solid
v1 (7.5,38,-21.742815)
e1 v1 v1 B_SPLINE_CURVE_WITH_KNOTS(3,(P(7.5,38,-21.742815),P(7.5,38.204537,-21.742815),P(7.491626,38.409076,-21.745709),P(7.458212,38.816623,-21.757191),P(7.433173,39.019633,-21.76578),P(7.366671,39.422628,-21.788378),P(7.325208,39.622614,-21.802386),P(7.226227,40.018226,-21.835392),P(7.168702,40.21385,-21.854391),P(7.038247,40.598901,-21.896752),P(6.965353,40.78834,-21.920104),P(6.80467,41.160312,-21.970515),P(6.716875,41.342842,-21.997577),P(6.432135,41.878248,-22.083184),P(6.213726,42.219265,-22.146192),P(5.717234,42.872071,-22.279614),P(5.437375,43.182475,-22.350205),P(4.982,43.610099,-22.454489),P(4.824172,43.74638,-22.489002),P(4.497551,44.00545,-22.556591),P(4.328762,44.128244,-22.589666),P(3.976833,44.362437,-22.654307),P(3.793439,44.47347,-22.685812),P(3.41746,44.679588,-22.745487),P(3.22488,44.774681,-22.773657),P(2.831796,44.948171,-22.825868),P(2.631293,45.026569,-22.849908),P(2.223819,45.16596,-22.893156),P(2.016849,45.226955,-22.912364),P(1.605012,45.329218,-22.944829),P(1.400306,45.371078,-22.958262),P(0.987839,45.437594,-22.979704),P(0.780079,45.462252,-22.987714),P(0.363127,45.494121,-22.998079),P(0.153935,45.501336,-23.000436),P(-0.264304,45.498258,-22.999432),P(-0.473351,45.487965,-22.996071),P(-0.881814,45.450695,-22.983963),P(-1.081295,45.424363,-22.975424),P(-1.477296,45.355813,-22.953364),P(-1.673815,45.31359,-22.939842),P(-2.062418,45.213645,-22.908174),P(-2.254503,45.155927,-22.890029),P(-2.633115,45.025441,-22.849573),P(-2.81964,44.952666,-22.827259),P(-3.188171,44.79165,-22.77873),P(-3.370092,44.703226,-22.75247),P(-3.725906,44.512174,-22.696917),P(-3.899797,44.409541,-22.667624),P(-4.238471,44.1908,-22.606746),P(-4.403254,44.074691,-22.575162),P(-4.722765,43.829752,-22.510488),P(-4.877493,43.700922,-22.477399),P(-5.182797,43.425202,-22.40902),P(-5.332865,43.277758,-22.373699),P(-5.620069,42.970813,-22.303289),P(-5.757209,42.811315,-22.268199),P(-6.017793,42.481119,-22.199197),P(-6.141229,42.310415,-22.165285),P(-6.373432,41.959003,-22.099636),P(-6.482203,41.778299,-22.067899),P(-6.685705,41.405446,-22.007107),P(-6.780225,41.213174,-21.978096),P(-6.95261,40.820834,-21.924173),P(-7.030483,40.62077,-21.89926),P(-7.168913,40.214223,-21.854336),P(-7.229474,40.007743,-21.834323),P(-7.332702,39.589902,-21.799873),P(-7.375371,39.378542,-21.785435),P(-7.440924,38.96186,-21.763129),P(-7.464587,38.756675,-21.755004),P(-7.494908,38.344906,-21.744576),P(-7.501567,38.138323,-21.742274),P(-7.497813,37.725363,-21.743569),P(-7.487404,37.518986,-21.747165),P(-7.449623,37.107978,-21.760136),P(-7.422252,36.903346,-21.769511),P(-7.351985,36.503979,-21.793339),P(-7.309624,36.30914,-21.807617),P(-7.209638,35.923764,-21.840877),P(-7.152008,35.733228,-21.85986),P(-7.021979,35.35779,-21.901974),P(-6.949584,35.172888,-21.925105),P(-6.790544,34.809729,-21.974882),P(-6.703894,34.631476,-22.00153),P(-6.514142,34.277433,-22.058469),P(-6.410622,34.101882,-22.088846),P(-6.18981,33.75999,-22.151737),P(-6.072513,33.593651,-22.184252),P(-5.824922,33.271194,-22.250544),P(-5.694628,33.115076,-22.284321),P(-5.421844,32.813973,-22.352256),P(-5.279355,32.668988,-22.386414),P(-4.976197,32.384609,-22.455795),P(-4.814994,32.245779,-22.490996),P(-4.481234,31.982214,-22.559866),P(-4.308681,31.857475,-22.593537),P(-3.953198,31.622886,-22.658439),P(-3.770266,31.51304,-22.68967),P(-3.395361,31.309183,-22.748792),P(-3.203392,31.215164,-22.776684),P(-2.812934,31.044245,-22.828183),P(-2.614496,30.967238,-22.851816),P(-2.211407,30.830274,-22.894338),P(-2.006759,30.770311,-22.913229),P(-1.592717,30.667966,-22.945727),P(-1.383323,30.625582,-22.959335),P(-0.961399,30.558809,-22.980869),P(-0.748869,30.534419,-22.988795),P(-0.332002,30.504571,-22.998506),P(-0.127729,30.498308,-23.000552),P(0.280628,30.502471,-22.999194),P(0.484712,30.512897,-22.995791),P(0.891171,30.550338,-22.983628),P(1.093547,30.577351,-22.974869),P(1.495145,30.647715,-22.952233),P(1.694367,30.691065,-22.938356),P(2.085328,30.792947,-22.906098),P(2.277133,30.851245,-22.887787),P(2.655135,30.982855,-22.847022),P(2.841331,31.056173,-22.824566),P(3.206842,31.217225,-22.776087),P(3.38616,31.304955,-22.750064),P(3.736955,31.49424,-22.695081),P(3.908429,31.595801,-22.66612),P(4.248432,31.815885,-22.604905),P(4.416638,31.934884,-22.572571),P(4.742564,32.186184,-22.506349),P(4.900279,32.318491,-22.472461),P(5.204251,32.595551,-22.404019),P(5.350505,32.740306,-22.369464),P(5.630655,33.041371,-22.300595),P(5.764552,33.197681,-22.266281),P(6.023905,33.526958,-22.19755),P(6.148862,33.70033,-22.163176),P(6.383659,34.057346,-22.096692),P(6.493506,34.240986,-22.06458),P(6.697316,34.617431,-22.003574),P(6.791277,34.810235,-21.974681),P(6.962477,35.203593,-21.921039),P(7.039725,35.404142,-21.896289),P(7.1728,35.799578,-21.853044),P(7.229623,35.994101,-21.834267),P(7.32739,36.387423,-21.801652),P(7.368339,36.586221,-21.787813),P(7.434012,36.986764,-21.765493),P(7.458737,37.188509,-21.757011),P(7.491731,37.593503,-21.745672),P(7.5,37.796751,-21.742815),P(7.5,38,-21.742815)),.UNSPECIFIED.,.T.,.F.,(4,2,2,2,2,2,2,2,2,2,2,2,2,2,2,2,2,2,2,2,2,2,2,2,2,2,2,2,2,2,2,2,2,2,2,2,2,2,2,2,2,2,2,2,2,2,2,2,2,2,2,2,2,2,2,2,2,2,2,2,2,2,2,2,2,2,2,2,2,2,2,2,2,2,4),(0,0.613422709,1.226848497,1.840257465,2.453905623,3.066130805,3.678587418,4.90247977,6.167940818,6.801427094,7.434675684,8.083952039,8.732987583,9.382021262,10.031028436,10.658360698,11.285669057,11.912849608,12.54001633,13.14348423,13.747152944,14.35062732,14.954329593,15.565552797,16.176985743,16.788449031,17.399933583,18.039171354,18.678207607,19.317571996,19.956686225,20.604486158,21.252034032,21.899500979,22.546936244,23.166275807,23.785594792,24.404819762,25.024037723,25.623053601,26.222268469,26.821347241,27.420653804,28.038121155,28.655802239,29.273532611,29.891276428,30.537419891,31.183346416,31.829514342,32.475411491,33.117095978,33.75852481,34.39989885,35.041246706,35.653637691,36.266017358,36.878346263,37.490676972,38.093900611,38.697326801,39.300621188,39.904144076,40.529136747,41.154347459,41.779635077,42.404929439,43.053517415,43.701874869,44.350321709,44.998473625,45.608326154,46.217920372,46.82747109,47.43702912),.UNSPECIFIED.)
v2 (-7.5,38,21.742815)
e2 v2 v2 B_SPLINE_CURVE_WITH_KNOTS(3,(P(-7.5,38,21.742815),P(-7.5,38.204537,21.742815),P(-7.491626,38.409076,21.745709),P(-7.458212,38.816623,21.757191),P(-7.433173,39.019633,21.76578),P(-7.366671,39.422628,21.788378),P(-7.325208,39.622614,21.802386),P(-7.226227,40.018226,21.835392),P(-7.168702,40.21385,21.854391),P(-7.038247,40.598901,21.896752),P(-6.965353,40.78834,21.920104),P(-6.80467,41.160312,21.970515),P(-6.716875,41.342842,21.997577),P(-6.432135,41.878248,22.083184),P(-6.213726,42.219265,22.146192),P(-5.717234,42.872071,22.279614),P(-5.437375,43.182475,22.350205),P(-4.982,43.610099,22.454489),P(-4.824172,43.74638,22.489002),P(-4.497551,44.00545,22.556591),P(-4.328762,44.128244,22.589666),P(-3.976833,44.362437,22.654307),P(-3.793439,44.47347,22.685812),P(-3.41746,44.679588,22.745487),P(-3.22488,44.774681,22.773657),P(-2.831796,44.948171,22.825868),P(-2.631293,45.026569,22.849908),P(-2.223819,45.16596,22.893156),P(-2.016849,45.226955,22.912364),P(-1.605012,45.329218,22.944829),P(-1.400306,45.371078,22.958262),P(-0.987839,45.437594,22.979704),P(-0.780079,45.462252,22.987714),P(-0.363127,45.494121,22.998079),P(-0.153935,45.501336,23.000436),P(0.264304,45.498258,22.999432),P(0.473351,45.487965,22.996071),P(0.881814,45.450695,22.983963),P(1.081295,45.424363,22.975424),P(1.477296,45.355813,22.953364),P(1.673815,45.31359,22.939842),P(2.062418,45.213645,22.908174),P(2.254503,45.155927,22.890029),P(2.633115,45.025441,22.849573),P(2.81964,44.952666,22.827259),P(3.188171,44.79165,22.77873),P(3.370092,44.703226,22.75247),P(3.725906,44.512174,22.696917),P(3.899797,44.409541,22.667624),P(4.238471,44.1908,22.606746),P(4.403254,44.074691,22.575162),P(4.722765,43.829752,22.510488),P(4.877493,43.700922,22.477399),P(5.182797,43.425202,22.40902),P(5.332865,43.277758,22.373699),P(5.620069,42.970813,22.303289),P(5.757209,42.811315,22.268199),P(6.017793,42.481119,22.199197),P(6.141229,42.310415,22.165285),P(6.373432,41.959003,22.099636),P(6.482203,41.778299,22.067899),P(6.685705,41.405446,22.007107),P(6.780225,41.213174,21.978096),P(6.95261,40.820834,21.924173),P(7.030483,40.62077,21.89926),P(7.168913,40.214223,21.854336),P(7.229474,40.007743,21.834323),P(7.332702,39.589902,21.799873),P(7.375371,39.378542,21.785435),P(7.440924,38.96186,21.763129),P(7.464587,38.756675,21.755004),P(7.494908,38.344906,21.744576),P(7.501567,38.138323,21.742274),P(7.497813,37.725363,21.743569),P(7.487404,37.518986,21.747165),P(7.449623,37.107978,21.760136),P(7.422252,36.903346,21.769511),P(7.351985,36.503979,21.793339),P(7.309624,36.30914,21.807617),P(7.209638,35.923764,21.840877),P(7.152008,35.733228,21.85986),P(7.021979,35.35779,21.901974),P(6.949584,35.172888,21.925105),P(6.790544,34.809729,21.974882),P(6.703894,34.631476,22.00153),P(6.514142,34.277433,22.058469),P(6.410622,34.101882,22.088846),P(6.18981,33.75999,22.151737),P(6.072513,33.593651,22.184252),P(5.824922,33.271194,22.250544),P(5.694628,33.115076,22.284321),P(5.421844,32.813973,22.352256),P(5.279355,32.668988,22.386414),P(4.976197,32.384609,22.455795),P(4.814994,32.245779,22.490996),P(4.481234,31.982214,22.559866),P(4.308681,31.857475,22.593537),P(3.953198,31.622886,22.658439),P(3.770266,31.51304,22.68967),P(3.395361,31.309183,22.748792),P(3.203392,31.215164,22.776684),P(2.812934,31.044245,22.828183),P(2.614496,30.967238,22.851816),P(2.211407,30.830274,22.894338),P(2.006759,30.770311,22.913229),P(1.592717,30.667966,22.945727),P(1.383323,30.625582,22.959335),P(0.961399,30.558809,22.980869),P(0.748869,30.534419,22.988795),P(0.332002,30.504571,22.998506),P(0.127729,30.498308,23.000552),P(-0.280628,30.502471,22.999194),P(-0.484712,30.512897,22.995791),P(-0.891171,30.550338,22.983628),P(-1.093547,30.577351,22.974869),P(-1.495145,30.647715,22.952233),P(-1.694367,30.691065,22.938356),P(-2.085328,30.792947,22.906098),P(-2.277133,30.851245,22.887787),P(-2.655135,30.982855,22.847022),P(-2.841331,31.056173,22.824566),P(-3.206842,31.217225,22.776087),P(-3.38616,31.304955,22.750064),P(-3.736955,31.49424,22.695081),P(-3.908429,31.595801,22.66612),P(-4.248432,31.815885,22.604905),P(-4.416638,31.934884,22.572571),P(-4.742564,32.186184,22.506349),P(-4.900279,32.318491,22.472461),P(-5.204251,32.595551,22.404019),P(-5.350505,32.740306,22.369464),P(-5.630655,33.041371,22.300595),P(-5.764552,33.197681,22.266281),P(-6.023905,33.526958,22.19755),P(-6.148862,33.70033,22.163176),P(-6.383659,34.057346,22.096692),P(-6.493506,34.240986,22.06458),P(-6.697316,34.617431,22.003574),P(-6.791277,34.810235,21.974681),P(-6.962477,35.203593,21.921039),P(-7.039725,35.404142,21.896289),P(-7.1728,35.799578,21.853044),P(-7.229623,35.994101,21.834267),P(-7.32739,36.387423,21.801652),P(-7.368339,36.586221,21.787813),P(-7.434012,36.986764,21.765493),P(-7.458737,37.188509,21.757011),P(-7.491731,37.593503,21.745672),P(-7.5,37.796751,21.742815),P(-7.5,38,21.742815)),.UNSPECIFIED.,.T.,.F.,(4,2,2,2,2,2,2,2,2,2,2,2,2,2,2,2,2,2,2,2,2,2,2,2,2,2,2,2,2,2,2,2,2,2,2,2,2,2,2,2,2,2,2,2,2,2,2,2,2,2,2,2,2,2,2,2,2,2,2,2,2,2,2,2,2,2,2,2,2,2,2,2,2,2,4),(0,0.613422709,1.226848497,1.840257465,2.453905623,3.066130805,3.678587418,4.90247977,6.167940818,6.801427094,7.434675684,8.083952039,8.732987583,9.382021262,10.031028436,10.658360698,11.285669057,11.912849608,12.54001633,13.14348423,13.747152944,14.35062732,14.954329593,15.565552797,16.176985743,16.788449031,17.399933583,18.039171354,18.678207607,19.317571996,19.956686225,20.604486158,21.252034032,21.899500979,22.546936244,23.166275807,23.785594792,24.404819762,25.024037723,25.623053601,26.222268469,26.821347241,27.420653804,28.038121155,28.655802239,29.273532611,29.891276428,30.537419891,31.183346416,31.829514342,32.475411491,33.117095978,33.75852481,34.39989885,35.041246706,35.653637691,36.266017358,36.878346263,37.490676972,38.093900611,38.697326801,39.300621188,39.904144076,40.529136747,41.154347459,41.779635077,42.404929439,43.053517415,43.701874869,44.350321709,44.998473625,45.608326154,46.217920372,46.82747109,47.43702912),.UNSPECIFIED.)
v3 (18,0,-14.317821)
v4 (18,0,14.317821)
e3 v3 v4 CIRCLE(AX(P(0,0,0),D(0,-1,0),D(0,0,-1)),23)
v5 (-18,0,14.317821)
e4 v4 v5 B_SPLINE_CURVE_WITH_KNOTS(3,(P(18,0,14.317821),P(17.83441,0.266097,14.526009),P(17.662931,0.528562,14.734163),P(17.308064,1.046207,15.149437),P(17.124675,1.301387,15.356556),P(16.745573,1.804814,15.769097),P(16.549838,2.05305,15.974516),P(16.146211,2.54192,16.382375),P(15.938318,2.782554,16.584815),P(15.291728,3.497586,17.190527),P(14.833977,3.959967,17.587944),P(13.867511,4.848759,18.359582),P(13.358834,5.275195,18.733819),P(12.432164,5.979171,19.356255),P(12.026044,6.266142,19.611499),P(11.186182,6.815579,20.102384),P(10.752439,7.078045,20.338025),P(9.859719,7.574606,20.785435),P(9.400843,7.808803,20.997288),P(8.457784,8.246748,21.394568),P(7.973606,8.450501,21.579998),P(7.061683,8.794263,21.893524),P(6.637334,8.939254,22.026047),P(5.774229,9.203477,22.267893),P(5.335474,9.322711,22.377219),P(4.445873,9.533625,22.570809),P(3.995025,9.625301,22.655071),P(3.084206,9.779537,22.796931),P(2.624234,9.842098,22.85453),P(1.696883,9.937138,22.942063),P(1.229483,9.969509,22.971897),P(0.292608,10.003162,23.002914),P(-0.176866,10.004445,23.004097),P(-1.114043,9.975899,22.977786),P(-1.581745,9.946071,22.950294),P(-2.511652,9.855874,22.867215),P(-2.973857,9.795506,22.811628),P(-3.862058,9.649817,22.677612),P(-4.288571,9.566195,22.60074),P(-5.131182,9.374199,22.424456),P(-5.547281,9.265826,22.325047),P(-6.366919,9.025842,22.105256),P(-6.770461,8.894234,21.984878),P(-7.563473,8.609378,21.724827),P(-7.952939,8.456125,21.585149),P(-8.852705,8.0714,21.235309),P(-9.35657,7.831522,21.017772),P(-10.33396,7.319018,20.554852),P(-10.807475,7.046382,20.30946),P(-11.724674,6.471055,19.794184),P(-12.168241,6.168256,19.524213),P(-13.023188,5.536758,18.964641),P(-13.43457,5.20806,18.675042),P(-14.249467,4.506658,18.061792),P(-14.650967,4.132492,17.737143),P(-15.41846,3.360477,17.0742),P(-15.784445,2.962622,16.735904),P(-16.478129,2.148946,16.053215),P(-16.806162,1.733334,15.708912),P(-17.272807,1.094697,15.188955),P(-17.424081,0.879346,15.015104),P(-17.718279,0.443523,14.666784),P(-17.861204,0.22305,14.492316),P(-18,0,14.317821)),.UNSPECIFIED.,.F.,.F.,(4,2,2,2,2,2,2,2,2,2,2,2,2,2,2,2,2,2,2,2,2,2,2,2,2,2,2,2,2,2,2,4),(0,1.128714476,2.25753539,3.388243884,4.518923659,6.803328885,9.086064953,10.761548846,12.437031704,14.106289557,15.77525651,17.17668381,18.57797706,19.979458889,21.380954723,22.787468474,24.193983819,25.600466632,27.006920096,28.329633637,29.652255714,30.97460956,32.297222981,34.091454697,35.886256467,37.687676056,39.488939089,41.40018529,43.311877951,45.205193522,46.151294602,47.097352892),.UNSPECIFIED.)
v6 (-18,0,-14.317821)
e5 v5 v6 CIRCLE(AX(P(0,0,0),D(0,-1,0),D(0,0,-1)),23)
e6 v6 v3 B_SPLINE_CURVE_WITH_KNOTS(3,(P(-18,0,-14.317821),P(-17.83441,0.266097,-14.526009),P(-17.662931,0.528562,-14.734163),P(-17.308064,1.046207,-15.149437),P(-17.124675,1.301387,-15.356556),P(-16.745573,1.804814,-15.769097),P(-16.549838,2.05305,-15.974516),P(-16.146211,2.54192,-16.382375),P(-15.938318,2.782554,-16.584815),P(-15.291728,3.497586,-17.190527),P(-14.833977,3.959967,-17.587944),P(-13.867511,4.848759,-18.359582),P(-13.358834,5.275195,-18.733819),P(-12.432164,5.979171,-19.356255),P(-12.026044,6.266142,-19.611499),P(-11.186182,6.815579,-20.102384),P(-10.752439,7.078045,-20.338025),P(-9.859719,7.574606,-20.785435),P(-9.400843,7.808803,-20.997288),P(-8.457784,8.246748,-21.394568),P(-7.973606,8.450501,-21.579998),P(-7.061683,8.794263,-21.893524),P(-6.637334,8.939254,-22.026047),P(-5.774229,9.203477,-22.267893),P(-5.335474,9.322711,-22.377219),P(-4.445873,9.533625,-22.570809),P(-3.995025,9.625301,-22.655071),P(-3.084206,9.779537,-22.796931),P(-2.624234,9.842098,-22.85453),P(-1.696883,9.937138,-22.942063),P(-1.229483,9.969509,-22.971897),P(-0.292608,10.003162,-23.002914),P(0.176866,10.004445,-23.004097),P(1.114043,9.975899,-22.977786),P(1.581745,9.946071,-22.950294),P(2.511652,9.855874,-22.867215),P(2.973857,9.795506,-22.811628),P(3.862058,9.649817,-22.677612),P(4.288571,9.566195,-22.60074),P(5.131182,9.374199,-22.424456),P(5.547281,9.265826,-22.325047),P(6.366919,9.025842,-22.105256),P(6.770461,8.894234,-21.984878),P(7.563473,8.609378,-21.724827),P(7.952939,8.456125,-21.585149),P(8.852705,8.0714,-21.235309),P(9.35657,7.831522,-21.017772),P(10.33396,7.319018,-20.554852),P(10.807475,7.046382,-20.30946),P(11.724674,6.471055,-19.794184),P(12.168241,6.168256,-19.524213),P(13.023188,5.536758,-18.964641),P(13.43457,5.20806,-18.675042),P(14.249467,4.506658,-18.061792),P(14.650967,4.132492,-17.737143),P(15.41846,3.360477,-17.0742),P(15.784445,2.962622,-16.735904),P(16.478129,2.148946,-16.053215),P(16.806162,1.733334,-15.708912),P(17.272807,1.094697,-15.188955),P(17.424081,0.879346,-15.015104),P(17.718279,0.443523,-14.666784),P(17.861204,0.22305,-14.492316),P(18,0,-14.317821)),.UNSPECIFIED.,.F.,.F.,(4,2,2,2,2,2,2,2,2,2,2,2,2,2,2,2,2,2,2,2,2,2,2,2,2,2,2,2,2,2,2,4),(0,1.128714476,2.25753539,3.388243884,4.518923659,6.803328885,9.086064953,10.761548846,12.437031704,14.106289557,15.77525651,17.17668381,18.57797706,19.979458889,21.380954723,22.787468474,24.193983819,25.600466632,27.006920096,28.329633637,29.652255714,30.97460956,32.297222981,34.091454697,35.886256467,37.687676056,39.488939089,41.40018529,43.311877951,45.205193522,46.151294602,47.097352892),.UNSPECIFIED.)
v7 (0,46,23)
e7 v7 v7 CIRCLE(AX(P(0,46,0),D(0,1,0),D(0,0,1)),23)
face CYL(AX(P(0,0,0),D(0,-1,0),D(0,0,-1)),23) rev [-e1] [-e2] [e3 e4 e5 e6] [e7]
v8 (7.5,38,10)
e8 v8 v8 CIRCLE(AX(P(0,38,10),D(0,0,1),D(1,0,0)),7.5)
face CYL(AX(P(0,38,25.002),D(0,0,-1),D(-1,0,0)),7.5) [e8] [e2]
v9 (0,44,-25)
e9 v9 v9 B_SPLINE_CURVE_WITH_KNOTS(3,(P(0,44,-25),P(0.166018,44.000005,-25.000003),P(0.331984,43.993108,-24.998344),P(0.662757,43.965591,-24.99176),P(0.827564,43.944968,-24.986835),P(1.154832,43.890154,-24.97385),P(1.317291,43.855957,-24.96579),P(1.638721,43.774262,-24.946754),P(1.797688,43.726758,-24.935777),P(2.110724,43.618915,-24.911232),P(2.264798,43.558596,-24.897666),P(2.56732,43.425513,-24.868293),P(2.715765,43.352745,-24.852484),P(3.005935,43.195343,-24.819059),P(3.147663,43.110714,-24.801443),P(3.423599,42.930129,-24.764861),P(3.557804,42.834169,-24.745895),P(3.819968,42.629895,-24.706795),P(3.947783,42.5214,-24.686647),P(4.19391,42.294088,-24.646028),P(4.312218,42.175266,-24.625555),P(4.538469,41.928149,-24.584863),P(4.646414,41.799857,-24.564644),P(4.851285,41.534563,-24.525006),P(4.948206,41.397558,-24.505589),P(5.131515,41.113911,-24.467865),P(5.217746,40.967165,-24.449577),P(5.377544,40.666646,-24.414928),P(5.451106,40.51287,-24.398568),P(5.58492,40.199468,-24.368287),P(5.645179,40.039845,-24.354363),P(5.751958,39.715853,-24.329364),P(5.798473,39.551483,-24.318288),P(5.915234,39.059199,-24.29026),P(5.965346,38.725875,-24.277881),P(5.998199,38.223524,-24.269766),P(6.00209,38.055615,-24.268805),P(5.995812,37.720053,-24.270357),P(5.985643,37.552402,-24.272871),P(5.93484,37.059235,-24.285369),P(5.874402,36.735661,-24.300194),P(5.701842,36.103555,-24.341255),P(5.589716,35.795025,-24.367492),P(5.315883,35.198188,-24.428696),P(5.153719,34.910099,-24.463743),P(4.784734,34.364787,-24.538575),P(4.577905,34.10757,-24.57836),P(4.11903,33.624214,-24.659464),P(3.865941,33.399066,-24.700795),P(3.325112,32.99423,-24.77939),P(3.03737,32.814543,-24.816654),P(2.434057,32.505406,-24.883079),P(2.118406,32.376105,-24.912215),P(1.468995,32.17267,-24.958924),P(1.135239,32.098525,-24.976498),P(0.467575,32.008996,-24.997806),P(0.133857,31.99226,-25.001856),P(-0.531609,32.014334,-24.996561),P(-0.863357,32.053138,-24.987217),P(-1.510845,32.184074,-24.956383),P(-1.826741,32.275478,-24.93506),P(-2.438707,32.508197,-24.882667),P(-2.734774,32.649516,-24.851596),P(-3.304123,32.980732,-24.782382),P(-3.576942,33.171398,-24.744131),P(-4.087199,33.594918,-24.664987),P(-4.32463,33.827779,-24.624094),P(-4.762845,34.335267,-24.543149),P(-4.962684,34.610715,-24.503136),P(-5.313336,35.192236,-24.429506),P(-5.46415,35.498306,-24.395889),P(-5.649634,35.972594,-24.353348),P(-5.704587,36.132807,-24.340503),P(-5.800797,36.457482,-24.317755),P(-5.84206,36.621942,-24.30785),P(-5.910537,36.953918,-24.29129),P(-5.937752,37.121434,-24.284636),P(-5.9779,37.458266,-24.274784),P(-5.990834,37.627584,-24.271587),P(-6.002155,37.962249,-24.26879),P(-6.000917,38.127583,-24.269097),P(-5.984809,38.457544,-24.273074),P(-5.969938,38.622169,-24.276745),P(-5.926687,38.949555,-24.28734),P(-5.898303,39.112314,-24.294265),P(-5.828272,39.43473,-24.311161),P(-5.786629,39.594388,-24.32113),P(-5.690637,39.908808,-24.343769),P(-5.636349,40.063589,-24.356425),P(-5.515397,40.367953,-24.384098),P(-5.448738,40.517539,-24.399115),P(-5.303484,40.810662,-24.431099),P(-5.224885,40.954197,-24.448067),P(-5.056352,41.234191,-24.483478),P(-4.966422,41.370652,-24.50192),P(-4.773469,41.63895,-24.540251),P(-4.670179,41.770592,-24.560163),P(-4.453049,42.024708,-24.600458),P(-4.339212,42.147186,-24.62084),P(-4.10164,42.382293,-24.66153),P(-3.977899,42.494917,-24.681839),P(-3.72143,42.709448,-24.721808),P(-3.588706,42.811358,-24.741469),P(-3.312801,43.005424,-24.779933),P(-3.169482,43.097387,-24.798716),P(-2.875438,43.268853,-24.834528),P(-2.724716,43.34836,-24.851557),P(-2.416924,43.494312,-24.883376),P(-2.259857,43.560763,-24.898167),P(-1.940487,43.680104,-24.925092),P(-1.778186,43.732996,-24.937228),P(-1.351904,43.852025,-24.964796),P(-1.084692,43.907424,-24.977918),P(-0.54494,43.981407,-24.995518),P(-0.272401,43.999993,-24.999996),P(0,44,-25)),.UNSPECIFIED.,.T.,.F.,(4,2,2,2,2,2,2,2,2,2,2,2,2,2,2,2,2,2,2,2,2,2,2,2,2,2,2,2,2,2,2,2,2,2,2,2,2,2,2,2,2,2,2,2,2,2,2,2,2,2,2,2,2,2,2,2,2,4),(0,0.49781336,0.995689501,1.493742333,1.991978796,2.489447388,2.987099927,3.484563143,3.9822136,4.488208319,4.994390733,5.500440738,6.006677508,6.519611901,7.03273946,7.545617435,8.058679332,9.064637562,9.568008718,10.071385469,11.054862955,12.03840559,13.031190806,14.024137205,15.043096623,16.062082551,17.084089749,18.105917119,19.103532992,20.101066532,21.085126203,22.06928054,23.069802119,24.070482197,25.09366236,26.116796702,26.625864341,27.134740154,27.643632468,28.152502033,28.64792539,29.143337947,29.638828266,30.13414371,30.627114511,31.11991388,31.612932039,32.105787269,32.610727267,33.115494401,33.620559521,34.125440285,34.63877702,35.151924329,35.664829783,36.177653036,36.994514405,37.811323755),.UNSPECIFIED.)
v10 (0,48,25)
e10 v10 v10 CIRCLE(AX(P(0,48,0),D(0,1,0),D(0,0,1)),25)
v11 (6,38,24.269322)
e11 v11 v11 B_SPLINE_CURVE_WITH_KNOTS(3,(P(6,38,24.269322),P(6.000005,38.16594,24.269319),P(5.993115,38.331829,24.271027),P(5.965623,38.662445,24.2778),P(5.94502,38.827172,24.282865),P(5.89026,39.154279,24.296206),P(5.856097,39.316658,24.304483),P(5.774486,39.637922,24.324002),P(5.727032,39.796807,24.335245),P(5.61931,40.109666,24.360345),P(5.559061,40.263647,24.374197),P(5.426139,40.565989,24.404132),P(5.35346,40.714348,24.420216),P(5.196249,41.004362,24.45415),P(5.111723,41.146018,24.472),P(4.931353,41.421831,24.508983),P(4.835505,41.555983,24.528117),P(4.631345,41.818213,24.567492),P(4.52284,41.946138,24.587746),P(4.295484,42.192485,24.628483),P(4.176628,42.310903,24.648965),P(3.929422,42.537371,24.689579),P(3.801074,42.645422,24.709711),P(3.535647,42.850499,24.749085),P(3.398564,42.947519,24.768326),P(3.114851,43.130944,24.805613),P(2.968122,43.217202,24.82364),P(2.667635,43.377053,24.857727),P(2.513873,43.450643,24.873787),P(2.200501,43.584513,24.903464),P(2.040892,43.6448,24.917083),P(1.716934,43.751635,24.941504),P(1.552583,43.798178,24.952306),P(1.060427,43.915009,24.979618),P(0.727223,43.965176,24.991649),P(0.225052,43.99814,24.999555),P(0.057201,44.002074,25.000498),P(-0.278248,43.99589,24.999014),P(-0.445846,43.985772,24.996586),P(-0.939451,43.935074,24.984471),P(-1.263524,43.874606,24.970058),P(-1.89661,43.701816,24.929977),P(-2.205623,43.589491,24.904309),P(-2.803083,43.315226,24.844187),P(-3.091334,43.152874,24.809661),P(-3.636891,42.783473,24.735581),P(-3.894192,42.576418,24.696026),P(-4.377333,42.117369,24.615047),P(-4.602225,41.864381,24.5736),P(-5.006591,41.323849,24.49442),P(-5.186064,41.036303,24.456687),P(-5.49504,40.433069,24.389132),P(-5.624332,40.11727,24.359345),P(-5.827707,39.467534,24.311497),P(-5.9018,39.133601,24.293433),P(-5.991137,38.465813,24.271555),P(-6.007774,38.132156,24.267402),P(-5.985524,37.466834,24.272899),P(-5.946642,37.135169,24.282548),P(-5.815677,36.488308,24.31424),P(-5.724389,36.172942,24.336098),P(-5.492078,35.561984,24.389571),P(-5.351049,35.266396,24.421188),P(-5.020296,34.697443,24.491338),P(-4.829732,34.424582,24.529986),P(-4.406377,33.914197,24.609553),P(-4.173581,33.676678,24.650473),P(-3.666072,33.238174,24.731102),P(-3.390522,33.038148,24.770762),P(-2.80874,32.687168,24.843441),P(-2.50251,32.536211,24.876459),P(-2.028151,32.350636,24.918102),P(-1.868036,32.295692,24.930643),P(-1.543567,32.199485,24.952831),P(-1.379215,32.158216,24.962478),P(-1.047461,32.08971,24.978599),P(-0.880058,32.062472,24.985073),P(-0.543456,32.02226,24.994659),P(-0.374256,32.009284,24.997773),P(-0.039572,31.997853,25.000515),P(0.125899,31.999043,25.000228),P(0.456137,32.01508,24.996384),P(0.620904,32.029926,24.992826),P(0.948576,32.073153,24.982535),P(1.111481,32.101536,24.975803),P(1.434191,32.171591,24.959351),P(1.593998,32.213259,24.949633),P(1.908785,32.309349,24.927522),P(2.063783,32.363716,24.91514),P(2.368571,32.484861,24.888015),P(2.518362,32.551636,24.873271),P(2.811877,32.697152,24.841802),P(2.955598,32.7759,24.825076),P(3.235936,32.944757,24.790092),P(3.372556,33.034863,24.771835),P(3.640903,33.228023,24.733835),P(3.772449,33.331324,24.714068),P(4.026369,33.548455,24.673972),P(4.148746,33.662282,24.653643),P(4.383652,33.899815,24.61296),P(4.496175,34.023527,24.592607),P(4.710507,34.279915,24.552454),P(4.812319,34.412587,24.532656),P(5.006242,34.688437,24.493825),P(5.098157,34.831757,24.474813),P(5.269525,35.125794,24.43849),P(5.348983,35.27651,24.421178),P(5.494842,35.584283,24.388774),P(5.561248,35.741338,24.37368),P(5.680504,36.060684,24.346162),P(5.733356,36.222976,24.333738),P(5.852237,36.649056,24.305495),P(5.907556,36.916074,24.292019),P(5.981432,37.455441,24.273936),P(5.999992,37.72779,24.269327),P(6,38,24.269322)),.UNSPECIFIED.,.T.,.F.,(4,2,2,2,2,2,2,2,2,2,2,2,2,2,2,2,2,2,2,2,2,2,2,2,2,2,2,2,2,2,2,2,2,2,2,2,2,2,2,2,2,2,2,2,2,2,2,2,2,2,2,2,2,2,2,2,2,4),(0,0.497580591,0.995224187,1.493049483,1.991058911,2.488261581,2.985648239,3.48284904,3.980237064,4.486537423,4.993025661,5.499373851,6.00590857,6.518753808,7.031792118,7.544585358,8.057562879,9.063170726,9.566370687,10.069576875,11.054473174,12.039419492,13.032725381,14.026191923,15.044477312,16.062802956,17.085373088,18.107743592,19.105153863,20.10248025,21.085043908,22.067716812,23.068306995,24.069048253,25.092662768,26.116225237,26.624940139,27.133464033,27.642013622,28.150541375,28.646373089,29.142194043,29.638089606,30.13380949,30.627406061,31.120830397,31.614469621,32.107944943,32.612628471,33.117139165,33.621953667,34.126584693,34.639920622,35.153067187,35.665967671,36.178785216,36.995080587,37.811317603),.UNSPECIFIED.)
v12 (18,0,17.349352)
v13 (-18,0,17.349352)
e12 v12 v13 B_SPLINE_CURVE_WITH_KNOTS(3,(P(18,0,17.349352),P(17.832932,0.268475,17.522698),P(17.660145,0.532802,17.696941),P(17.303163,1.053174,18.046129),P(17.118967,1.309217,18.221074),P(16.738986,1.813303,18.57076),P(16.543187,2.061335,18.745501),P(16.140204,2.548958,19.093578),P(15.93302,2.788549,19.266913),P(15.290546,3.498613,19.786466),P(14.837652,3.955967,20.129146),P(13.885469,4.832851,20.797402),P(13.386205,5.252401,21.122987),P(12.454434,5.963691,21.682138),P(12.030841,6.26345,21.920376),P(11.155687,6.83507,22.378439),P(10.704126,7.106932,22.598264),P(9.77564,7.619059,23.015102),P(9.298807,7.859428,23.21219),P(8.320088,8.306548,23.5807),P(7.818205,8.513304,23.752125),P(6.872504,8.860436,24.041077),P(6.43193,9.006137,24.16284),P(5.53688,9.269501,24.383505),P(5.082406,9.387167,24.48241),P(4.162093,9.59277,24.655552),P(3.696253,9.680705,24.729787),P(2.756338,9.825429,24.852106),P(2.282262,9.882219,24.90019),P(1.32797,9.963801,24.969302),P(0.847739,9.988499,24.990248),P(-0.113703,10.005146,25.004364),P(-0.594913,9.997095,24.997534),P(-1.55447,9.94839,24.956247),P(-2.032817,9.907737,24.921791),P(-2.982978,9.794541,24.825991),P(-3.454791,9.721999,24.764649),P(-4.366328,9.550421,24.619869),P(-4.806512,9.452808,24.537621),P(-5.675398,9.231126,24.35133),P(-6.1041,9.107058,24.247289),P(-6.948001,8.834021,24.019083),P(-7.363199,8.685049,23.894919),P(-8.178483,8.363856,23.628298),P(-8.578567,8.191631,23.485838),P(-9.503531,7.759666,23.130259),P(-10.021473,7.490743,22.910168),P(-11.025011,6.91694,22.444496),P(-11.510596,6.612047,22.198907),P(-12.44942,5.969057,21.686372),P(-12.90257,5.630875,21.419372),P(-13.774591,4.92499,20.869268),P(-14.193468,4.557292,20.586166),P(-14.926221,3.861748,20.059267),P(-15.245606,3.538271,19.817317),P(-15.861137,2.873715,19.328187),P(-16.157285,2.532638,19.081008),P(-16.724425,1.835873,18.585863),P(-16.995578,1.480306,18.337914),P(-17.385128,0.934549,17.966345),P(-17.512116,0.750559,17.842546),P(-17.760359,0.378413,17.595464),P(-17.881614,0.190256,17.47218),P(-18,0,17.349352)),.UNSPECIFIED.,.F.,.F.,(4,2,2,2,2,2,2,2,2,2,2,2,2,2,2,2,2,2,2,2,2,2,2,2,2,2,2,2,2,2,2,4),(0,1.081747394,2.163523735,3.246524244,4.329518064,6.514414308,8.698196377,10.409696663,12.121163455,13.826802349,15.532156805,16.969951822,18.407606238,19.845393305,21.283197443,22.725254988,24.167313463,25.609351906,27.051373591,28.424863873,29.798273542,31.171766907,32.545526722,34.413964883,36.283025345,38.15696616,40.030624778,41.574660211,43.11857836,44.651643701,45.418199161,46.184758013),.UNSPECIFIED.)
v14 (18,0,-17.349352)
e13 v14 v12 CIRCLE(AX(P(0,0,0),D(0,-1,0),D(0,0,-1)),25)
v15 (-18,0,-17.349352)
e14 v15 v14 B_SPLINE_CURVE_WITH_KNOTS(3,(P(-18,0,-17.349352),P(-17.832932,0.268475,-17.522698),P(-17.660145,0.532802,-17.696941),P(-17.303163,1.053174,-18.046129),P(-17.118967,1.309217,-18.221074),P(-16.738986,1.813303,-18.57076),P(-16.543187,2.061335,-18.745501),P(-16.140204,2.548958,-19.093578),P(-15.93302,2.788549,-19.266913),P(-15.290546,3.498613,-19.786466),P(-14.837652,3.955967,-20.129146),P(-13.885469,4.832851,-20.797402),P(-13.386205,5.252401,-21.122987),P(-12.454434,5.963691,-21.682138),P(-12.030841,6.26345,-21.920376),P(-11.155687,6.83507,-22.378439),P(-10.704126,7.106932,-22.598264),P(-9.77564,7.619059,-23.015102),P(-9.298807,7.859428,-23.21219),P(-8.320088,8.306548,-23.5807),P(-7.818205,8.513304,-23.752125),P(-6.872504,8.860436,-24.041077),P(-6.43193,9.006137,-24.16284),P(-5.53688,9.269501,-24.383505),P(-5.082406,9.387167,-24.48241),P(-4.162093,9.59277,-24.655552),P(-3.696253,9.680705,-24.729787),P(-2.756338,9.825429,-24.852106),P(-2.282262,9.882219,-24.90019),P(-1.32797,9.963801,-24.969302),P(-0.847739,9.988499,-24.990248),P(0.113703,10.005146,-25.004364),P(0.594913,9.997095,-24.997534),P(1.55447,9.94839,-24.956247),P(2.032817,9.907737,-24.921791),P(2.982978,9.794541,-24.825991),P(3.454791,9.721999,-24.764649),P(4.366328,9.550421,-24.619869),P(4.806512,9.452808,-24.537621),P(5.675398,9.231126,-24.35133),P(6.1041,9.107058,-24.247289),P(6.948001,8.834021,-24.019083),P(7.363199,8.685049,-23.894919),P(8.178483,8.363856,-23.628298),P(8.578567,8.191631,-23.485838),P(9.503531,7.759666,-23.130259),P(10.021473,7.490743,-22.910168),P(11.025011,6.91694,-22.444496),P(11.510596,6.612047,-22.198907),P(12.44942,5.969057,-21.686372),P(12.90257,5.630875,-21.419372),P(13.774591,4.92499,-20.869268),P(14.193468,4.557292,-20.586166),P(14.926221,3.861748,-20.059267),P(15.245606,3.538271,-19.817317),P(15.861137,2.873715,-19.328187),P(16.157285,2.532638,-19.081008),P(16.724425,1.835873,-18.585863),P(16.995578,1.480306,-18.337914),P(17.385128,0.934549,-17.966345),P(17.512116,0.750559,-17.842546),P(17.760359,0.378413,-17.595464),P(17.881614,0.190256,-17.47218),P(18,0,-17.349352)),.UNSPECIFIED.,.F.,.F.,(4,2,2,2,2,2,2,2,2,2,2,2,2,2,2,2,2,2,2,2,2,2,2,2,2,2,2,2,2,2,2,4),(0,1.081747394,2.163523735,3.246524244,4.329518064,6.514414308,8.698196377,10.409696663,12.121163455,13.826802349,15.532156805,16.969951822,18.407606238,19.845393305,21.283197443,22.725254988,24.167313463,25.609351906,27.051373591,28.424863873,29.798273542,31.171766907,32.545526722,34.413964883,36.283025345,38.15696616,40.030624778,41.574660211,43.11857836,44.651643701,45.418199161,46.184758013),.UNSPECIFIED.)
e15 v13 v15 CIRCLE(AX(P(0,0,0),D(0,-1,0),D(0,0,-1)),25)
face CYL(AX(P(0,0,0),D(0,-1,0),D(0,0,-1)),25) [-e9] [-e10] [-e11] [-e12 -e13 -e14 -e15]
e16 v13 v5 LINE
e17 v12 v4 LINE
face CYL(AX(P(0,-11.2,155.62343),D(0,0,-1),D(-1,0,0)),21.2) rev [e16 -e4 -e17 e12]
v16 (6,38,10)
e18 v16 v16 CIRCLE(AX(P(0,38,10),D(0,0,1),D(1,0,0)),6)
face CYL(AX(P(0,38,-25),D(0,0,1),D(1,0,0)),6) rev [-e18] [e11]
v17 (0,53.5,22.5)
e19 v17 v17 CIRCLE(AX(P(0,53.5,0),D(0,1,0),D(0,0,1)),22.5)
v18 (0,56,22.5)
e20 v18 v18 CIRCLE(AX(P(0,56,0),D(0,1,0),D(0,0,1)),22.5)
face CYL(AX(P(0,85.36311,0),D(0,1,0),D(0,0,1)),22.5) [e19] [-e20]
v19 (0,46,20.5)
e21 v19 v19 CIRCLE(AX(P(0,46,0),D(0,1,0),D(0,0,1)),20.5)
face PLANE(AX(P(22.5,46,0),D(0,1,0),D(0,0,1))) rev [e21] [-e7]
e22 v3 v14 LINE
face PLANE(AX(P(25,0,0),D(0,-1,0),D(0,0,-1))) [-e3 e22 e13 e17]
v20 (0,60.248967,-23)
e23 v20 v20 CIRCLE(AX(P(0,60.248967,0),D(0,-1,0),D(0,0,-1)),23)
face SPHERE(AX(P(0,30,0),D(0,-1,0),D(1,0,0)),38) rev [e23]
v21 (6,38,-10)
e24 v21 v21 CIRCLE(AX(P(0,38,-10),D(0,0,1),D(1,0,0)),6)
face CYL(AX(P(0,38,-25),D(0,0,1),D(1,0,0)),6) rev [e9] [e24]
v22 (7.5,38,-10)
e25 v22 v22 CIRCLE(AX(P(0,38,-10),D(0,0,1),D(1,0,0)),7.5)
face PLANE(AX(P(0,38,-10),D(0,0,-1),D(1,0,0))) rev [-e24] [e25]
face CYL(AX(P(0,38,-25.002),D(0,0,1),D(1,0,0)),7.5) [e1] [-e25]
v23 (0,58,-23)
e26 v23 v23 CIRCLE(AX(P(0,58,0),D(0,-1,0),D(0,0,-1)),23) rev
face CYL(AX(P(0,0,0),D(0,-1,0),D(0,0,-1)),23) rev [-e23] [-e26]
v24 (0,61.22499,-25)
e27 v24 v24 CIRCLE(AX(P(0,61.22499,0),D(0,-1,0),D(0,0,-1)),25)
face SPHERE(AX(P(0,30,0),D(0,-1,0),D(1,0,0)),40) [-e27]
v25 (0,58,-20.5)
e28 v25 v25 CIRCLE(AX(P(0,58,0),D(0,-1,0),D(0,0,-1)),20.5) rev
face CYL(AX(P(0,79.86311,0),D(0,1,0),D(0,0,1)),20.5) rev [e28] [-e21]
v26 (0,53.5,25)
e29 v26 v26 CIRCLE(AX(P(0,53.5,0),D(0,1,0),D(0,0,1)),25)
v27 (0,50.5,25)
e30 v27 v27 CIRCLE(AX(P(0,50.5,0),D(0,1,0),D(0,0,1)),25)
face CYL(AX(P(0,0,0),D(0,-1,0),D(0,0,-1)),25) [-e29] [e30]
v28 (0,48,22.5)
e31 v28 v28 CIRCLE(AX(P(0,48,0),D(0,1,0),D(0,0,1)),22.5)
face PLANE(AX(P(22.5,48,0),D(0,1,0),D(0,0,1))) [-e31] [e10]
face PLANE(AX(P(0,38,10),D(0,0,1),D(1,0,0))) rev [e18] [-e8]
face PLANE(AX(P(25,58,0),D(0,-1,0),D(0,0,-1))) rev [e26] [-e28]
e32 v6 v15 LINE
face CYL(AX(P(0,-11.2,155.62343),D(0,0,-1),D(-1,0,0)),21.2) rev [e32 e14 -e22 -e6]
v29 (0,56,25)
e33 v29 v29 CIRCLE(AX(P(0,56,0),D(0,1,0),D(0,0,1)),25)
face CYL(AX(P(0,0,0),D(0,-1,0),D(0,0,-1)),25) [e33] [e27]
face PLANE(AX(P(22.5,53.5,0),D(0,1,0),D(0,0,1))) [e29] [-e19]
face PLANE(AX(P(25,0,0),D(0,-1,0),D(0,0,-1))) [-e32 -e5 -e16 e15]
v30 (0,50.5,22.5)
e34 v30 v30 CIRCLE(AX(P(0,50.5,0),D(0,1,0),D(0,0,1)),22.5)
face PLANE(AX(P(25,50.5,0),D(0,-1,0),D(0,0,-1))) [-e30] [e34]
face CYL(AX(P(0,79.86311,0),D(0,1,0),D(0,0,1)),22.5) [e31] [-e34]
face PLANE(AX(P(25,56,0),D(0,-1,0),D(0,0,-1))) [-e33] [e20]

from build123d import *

# Parameters (mm, degrees)
SKETCH2_W                = 2.5
SKETCH2_H                = 2.5
LPATTERN2_COUNT          = 2
LPATTERN2_PITCH          = 5.5
CUT_EXTRUDE1_DEPTH       = 79.421935707
CUT_EXTRUDE1_DEPTH_BACK  = 79.421935707
CUT_EXTRUDE2_DEPTH       = 79.421935771
CUT_EXTRUDE2_DEPTH_BACK  = 79.421935771
SKETCH4_R                = 6
BOSS_EXTRUDE4_REACH      = 90.422
BOSS_EXTRUDE4_END_RADIUS = 23
BOSS_EXTRUDE4_START      = 10
SKETCH5_R                = 7.5
SKETCH5_R_2              = 6


# Read off the part's stored shape, not the designer's step: Shell1
with BuildPart() as part:
    # Sketch1 → Revolve1 (revolve)
    with BuildSketch(Plane.XY):
        with BuildLine():
            Line((0, 0), (0, 70))
            ThreePointArc((0, 70), (13.247648854, 67.742546282), (25, 61.224989992))
            Line((25, 61.224989992), (25, 0))
            Line((25, 0), (0, 0))
        make_face()
    revolve(axis=Axis((0, 0, 0), (0, 1, 0)))

    # Sketch2 → Cut-Revolve2 (revolve, cut)
    with BuildSketch(Plane.XY, mode=Mode.PRIVATE) as cut_revolve2_sk:
        with Locations((23.75, 49.25)):
            Rectangle(SKETCH2_W, SKETCH2_H)
    cut_revolve2 = revolve(cut_revolve2_sk.sketch.rotate(Axis((0, 79.863110142, 0), (0, 1, 0)), 90), axis=Axis((0, 79.863110142, 0), (0, 1, 0)), mode=Mode.SUBTRACT)

    # LPattern2: Cut-Revolve2 ×2
    with Locations(*[(0, i * LPATTERN2_PITCH, 0) for i in range(1, LPATTERN2_COUNT)]):
        add(cut_revolve2, mode=Mode.SUBTRACT)

    # Shell1 outline → Shell1 (revolve, cut)
    with BuildSketch(Plane.XY):
        with BuildLine():
            Line((0, 0), (23, 0))
            Line((23, 0), (23, 46))
            Line((23, 46), (20.5, 46))
            Line((20.5, 46), (20.5, 58))
            Line((20.5, 58), (23, 58))
            Line((23, 58), (23.00000001, 60.248966917))
            ThreePointArc((23.00000001, 60.248966917), (12.135469854, 66.010142619), (0, 68))
            Line((0, 68), (0, 0))
        make_face()
    revolve(axis=Axis((0, 0, 0), (0, 1, 0)), mode=Mode.SUBTRACT)

    # Sketch3 → Cut-Extrude1 (cut, two sides: drawn at the far end of the back side and taken through both)
    with BuildSketch(Plane.XY.offset(-CUT_EXTRUDE1_DEPTH_BACK)):
        with BuildLine():
            Line((-110.085446515, -147.994467613), (-18, 0))
            ThreePointArc((-18, 0), (0, 10), (18, 0))
            Line((18, 0), (110.085446515, -147.994467613))
            Line((110.085446515, -147.994467613), (110.085446515, -496.603657989))
            Line((110.085446515, -496.603657989), (-110.085446515, -496.603657989))
            Line((-110.085446515, -496.603657989), (-110.085446515, -147.994467613))
        make_face()
    extrude(amount=CUT_EXTRUDE1_DEPTH + CUT_EXTRUDE1_DEPTH_BACK, mode=Mode.SUBTRACT)

    # Sketch4 → Cut-Extrude2 (cut, two sides: drawn at the far end of the back side and taken through both)
    with BuildSketch(Plane.XY.offset(-CUT_EXTRUDE2_DEPTH_BACK)):
        with Locations((0, 38)):
            Circle(SKETCH4_R)
    extrude(amount=CUT_EXTRUDE2_DEPTH + CUT_EXTRUDE2_DEPTH_BACK, mode=Mode.SUBTRACT)

    # Boss-Extrude4: up to this cylinder (the profile starts inside it)
    boss_extrude4_end = Plane(origin=(0, 38, 0), z_dir=(0, -1, 0)) * Cylinder(BOSS_EXTRUDE4_END_RADIUS, 227.844, mode=Mode.PRIVATE)
    # Sketch5 → Boss-Extrude4 (add, up to the surface)
    with BuildSketch(Plane.XY.offset(BOSS_EXTRUDE4_START), mode=Mode.PRIVATE) as boss_extrude4_sk1:
        with Locations(Location((0, 38, 0), (0, 0, 180))):
            Circle(SKETCH5_R)
        with Locations((0, 38)):
            Circle(SKETCH5_R_2, mode=Mode.SUBTRACT)
    boss_extrude4_tool1 = extrude(boss_extrude4_sk1.sketch, amount=BOSS_EXTRUDE4_REACH, mode=Mode.PRIVATE) & boss_extrude4_end
    boss_extrude4 = boss_extrude4_tool1.solids().sort_by_distance((7.287868, 38, 10))[0]
    add(boss_extrude4)

    # Mirror1: Boss-Extrude4 across plane
    add(boss_extrude4.mirror(Plane.XY))


solid = part.part
